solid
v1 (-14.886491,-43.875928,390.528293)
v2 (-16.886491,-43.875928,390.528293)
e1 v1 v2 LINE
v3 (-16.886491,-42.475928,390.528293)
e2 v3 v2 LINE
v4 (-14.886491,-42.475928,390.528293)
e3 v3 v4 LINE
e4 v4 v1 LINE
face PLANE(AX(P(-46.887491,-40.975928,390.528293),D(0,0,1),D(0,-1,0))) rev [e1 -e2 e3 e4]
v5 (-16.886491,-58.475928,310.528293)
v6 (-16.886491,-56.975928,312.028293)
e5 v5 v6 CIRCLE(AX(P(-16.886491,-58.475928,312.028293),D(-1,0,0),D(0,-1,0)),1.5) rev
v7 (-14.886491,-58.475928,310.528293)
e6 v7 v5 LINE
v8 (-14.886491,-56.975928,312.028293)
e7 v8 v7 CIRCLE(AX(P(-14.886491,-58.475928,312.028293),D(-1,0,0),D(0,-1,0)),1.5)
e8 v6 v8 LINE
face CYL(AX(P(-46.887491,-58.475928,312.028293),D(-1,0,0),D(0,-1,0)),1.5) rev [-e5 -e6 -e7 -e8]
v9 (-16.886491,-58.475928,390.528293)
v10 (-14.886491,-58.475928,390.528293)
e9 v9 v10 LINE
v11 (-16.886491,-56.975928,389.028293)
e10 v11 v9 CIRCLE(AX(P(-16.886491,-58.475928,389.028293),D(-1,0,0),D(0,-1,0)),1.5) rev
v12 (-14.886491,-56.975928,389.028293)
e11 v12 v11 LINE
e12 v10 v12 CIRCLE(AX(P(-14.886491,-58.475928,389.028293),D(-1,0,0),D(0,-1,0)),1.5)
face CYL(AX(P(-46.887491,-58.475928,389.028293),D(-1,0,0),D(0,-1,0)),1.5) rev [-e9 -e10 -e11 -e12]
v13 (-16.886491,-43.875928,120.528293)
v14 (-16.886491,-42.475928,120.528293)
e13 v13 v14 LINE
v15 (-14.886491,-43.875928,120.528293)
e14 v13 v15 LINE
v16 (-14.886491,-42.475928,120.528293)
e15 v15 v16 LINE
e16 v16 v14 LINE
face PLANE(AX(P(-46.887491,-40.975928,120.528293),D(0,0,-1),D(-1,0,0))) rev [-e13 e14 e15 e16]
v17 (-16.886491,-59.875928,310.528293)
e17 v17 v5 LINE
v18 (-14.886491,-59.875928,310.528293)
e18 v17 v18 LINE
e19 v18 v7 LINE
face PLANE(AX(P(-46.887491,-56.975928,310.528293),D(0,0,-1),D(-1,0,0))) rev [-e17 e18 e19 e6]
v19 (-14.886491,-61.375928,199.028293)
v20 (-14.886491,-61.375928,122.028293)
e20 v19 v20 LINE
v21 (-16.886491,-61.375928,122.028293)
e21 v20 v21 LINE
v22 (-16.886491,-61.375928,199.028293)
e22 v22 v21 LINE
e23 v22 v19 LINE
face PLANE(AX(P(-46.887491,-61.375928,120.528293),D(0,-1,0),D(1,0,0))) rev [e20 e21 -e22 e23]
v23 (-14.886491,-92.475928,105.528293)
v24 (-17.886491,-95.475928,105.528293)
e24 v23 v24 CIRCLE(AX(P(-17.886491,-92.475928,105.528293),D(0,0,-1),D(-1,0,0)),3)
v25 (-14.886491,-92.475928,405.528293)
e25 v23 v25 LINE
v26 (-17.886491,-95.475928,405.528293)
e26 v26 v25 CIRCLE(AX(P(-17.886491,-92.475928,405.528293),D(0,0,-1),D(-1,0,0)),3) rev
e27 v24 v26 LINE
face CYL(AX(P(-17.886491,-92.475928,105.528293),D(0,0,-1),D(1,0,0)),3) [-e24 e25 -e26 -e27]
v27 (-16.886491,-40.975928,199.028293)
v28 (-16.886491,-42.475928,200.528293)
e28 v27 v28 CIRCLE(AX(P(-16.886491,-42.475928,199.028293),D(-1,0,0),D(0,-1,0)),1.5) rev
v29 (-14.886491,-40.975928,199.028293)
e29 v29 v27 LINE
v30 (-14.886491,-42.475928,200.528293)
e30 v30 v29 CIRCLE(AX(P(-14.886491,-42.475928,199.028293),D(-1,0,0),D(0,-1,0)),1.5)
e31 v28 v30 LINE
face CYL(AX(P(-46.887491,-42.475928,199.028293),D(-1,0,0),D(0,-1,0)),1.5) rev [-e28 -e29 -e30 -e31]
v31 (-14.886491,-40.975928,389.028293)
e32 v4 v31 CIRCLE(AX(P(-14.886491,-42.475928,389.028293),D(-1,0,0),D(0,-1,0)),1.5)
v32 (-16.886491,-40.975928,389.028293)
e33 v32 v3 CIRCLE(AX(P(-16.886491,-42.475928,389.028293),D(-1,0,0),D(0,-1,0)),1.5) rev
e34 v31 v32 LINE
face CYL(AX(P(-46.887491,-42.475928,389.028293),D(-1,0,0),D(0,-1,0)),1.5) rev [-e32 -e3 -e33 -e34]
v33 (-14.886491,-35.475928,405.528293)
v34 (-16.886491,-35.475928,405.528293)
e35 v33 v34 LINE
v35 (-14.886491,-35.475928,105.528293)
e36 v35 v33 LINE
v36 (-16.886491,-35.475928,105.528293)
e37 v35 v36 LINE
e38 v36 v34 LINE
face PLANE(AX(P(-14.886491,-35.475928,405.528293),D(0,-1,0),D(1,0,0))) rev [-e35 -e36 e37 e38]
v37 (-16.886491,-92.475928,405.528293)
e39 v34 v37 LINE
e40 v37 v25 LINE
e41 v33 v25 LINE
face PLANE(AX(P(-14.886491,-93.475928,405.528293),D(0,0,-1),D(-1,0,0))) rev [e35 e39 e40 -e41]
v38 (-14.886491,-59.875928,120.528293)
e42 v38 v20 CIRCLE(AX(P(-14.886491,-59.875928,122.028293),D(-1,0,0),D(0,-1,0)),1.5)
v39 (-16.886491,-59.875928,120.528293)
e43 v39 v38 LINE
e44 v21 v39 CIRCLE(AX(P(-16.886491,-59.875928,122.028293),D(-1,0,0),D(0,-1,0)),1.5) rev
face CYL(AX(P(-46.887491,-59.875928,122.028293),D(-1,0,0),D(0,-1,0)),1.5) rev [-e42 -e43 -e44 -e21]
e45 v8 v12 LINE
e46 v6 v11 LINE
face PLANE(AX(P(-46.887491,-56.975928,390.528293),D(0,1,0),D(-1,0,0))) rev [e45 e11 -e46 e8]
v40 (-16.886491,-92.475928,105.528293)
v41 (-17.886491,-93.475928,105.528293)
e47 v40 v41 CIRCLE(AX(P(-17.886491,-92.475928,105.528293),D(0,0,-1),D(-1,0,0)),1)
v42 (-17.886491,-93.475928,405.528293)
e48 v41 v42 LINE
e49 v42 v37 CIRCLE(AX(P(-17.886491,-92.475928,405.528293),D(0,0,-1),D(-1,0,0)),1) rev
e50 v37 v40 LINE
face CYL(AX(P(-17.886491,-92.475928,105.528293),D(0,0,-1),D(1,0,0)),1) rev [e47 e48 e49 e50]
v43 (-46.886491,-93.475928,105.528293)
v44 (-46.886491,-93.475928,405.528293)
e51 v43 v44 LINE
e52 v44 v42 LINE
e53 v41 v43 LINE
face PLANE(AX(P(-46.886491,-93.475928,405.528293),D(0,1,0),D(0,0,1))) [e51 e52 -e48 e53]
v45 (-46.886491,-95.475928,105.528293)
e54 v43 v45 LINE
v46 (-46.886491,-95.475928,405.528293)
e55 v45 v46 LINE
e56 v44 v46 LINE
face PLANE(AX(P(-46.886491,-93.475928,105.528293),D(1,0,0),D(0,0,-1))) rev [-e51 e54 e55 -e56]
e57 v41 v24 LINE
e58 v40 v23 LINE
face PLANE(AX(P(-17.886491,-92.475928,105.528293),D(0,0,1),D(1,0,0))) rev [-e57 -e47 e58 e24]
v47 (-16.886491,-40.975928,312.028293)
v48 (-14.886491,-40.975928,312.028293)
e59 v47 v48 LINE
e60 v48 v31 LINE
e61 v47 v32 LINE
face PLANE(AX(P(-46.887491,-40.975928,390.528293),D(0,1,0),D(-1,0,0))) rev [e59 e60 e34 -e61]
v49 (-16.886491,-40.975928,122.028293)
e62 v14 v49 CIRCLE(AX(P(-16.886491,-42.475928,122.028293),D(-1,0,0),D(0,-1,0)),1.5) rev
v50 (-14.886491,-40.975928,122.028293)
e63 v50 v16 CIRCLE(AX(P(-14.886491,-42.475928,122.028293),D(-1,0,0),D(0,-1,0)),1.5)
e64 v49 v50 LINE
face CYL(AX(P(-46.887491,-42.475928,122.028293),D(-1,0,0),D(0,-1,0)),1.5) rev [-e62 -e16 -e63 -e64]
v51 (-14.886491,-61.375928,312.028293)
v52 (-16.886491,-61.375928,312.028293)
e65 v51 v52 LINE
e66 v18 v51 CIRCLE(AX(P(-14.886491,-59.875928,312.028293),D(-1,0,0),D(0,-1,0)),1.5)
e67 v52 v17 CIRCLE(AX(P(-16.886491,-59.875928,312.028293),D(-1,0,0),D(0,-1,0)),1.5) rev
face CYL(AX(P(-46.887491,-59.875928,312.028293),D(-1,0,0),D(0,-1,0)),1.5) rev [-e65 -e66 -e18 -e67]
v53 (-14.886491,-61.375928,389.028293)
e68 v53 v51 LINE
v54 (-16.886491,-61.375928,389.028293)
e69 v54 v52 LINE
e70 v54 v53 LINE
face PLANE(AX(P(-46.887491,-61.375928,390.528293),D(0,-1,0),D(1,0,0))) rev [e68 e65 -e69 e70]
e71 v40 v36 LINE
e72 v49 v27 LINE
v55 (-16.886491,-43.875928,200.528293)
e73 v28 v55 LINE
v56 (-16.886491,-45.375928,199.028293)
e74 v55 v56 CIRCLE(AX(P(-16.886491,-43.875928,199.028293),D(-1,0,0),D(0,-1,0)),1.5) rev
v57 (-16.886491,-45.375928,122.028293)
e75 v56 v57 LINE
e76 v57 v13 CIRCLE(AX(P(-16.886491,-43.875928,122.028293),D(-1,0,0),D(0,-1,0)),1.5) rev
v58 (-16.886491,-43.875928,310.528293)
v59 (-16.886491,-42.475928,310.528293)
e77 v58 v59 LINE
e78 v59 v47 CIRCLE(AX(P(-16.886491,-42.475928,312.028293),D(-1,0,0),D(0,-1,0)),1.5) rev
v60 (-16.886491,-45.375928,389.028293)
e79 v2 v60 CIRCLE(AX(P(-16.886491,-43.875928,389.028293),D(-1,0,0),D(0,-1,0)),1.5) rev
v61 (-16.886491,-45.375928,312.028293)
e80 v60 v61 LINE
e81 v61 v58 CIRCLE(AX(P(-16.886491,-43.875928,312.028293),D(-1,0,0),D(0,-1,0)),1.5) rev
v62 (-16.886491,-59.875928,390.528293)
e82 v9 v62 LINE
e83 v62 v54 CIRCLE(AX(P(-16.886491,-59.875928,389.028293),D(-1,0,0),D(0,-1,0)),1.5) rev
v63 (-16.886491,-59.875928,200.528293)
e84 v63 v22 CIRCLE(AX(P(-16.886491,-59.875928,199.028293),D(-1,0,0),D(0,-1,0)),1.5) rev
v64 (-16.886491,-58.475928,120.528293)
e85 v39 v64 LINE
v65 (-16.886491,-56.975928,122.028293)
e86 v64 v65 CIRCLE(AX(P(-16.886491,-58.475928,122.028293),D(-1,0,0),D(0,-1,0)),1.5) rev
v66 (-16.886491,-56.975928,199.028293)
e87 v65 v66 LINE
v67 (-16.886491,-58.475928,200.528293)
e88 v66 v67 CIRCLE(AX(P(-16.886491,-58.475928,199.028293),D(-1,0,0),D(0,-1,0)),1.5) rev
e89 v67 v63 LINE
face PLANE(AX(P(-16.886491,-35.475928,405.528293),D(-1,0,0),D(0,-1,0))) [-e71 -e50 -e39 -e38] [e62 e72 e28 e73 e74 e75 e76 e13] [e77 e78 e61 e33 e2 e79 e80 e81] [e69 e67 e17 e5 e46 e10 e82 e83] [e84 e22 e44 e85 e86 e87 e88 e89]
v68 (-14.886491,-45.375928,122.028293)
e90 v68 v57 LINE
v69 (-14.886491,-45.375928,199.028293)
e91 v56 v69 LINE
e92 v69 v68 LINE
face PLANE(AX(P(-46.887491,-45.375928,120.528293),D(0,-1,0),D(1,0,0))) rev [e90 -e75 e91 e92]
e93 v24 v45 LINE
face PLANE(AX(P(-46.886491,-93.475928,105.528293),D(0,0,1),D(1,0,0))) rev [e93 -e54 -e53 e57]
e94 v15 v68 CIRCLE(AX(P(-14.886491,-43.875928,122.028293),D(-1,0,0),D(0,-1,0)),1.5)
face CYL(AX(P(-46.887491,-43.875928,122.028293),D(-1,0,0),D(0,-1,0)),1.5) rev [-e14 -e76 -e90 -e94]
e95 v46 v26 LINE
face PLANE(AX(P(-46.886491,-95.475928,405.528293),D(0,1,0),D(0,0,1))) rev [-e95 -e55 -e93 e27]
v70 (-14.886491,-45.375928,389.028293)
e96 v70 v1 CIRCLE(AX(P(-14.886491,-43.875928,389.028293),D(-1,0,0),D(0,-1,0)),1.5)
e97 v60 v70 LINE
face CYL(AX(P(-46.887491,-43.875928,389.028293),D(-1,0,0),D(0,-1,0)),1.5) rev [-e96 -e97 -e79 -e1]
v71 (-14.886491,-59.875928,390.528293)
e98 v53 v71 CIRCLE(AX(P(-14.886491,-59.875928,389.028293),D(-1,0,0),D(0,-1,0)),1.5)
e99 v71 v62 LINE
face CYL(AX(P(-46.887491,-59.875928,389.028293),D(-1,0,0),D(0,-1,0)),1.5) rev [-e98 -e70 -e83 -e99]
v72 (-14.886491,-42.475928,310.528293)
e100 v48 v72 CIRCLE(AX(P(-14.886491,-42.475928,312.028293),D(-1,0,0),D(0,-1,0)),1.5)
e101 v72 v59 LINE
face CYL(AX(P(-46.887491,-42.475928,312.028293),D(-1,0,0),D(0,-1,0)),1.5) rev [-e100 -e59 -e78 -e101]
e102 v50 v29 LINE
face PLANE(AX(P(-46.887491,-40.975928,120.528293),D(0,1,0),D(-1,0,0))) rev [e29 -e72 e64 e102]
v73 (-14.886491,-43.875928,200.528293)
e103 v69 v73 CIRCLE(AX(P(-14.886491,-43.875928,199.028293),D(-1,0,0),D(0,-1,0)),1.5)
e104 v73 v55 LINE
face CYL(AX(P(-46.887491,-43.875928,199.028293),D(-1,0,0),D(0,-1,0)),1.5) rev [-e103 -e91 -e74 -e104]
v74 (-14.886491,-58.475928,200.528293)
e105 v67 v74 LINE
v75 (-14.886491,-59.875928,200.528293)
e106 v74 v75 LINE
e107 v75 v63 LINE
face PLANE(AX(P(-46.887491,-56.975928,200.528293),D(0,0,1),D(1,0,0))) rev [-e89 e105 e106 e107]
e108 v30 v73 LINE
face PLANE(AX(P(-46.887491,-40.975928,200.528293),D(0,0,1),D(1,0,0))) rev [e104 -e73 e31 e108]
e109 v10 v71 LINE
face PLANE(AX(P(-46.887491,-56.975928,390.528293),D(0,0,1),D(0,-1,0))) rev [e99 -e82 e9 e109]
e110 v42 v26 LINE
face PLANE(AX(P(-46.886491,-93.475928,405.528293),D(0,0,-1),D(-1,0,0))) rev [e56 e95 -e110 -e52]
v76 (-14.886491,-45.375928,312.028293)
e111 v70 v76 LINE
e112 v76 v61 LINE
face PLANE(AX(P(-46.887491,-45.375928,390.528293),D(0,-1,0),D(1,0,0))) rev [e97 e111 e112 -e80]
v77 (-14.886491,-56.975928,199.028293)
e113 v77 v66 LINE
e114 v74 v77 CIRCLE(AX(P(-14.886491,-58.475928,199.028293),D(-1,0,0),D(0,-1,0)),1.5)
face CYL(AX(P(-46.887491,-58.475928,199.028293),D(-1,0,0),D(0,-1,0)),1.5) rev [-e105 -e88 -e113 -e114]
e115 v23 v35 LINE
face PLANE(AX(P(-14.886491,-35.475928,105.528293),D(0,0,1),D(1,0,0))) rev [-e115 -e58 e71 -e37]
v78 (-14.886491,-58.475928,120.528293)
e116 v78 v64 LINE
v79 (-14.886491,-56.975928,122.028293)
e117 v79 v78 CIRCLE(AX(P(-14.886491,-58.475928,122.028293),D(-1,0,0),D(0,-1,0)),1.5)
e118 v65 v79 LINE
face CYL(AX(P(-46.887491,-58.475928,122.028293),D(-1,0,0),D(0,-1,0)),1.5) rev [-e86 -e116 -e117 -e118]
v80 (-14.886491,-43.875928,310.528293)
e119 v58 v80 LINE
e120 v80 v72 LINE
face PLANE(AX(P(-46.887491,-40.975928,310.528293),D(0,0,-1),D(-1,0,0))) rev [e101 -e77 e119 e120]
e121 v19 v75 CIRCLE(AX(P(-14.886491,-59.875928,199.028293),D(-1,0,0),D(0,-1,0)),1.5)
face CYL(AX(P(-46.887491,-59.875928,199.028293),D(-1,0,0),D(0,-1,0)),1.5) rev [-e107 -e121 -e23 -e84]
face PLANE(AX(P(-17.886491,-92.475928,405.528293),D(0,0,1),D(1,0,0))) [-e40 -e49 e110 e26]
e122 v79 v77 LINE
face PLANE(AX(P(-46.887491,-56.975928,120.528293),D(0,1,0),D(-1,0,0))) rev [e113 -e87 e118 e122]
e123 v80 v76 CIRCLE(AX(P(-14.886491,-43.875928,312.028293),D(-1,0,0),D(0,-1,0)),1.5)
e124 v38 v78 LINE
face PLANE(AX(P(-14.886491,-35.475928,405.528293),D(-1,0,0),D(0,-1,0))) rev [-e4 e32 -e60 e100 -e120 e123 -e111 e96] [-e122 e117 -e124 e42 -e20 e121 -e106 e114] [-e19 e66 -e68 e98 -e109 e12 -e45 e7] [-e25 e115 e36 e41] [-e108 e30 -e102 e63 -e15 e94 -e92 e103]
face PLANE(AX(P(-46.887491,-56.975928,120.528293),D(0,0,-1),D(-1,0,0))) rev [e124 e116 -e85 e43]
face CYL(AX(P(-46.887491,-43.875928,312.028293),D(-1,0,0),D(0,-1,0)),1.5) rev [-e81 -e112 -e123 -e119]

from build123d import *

# Parameters (mm, degrees)
SKETCH1_W                    = 30
SKETCH1_H                    = 300
BASE_FLANGE1_DEPTH           = 2
EDGE_FLANGE1_STRIP_W         = 10
EDGE_FLANGE1_STRIP_H         = 2
EDGE_FLANGE1_STRIP_CUT_DEPTH = 300
EDGE_FLANGE1_DEPTH           = 300
CUT_EXTRUDE1_REACH           = 419.843
SKETCH8_W                    = 80
SKETCH8_H                    = 4.4
FILLET1_R                    = 1.5


# Sheet-metal steps are written as plain solids
with BuildPart() as part:
    # Sketch1 → Base-Flange1 (new body)
    with BuildSketch(Plane(origin=(0, -95.475928118, 0), x_dir=(1, 0, 0), z_dir=(0, 1, 0))):
        with Locations((-31.886491489, -255.528293106)):
            Rectangle(SKETCH1_W, SKETCH1_H)
    extrude(amount=BASE_FLANGE1_DEPTH)

    # Edge-Flange1 strip (across the edge) → Edge-Flange1 strip cut (cut)
    with BuildSketch(Plane(origin=(-16.886491489, -93.475928118, 405.528293106), x_dir=(-1, 0, 0), z_dir=(0, 0, -1))):
        with Locations((-4, -1)):
            Rectangle(EDGE_FLANGE1_STRIP_W, EDGE_FLANGE1_STRIP_H)
    extrude(amount=EDGE_FLANGE1_STRIP_CUT_DEPTH, mode=Mode.SUBTRACT)

    # Edge-Flange1 section (across the edge) → Edge-Flange1 (add)
    with BuildSketch(Plane(origin=(-16.886491489, -93.475928118, 405.528293106), x_dir=(-1, 0, 0), z_dir=(0, 0, -1))):
        with BuildLine():
            Line((-2, 1), (-2, 58))
            Line((-2, 58), (0, 58))
            Line((0, 58), (0, 1))
            ThreePointArc((0, 1), (0.292893219, 0.292893219), (1, 0))
            Line((1, 0), (1, -2))
            ThreePointArc((1, -2), (-1.121320344, -1.121320344), (-2, 1))
        make_face()
    extrude(amount=EDGE_FLANGE1_DEPTH)

    # Sketch8 → Cut-Extrude1 (cut, up to next)
    with BuildSketch(Plane(origin=(-14.886491489, 0, 0), x_dir=(0, 0, -1), z_dir=(1, 0, 0)), mode=Mode.PRIVATE) as cut_extrude1_sk1:
        with Locations((-160.528293106, -43.175928118)):
            Rectangle(SKETCH8_W, SKETCH8_H)
    cut_extrude1_tool1 = extrude(cut_extrude1_sk1.sketch, amount=-CUT_EXTRUDE1_REACH, mode=Mode.PRIVATE) & part.part
    # Sketch8 → Cut-Extrude1 (cut, up to next)
    with BuildSketch(Plane(origin=(-14.886491489, 0, 0), x_dir=(0, 0, -1), z_dir=(1, 0, 0)), mode=Mode.PRIVATE) as cut_extrude1_sk2:
        with Locations((-160.528293106, -59.175928118)):
            Rectangle(SKETCH8_W, SKETCH8_H)
    cut_extrude1_tool2 = extrude(cut_extrude1_sk2.sketch, amount=-CUT_EXTRUDE1_REACH, mode=Mode.PRIVATE) & part.part
    # Sketch8 → Cut-Extrude1 (cut, up to next)
    with BuildSketch(Plane(origin=(-14.886491489, 0, 0), x_dir=(0, 0, -1), z_dir=(1, 0, 0)), mode=Mode.PRIVATE) as cut_extrude1_sk3:
        with Locations((-350.528293106, -43.175928118)):
            Rectangle(SKETCH8_W, SKETCH8_H)
    cut_extrude1_tool3 = extrude(cut_extrude1_sk3.sketch, amount=-CUT_EXTRUDE1_REACH, mode=Mode.PRIVATE) & part.part
    # Sketch8 → Cut-Extrude1 (cut, up to next)
    with BuildSketch(Plane(origin=(-14.886491489, 0, 0), x_dir=(0, 0, -1), z_dir=(1, 0, 0)), mode=Mode.PRIVATE) as cut_extrude1_sk4:
        with Locations((-350.528293106, -59.175928118)):
            Rectangle(SKETCH8_W, SKETCH8_H)
    cut_extrude1_tool4 = extrude(cut_extrude1_sk4.sketch, amount=-CUT_EXTRUDE1_REACH, mode=Mode.PRIVATE) & part.part
    add(cut_extrude1_tool1.solids().sort_by_distance((-14.886491, -43.175928, 160.528293))[0], mode=Mode.SUBTRACT)
    add(cut_extrude1_tool2.solids().sort_by_distance((-14.886491, -59.175928, 160.528293))[0], mode=Mode.SUBTRACT)
    add(cut_extrude1_tool3.solids().sort_by_distance((-14.886491, -43.175928, 350.528293))[0], mode=Mode.SUBTRACT)
    add(cut_extrude1_tool4.solids().sort_by_distance((-14.886491, -59.175928, 350.528293))[0], mode=Mode.SUBTRACT)

    # Fillet1
    fillet1_edges = [part.edges().sort_by_distance(p)[0] for p in [
        (-15.886491489, -40.975928118, 120.528293106),
        (-15.886491489, -45.375928118, 120.528293106),
        (-15.886491489, -45.375928118, 200.528293106),
        (-15.886491489, -40.975928118, 200.528293106),
        (-15.886491489, -56.975928118, 120.528293106),
        (-15.886491489, -61.375928118, 120.528293106),
        (-15.886491489, -61.375928118, 200.528293106),
        (-15.886491489, -56.975928118, 200.528293106),
        (-15.886491489, -45.375928118, 390.528293106),
        (-15.886491489, -40.975928118, 390.528293106),
        (-15.886491489, -40.975928118, 310.528293106),
        (-15.886491489, -45.375928118, 310.528293106),
        (-15.886491489, -61.375928118, 390.528293106),
        (-15.886491489, -56.975928118, 390.528293106),
        (-15.886491489, -56.975928118, 310.528293106),
        (-15.886491489, -61.375928118, 310.528293106),
    ]]
    fillet(fillet1_edges, radius=FILLET1_R)


solid = part.part
